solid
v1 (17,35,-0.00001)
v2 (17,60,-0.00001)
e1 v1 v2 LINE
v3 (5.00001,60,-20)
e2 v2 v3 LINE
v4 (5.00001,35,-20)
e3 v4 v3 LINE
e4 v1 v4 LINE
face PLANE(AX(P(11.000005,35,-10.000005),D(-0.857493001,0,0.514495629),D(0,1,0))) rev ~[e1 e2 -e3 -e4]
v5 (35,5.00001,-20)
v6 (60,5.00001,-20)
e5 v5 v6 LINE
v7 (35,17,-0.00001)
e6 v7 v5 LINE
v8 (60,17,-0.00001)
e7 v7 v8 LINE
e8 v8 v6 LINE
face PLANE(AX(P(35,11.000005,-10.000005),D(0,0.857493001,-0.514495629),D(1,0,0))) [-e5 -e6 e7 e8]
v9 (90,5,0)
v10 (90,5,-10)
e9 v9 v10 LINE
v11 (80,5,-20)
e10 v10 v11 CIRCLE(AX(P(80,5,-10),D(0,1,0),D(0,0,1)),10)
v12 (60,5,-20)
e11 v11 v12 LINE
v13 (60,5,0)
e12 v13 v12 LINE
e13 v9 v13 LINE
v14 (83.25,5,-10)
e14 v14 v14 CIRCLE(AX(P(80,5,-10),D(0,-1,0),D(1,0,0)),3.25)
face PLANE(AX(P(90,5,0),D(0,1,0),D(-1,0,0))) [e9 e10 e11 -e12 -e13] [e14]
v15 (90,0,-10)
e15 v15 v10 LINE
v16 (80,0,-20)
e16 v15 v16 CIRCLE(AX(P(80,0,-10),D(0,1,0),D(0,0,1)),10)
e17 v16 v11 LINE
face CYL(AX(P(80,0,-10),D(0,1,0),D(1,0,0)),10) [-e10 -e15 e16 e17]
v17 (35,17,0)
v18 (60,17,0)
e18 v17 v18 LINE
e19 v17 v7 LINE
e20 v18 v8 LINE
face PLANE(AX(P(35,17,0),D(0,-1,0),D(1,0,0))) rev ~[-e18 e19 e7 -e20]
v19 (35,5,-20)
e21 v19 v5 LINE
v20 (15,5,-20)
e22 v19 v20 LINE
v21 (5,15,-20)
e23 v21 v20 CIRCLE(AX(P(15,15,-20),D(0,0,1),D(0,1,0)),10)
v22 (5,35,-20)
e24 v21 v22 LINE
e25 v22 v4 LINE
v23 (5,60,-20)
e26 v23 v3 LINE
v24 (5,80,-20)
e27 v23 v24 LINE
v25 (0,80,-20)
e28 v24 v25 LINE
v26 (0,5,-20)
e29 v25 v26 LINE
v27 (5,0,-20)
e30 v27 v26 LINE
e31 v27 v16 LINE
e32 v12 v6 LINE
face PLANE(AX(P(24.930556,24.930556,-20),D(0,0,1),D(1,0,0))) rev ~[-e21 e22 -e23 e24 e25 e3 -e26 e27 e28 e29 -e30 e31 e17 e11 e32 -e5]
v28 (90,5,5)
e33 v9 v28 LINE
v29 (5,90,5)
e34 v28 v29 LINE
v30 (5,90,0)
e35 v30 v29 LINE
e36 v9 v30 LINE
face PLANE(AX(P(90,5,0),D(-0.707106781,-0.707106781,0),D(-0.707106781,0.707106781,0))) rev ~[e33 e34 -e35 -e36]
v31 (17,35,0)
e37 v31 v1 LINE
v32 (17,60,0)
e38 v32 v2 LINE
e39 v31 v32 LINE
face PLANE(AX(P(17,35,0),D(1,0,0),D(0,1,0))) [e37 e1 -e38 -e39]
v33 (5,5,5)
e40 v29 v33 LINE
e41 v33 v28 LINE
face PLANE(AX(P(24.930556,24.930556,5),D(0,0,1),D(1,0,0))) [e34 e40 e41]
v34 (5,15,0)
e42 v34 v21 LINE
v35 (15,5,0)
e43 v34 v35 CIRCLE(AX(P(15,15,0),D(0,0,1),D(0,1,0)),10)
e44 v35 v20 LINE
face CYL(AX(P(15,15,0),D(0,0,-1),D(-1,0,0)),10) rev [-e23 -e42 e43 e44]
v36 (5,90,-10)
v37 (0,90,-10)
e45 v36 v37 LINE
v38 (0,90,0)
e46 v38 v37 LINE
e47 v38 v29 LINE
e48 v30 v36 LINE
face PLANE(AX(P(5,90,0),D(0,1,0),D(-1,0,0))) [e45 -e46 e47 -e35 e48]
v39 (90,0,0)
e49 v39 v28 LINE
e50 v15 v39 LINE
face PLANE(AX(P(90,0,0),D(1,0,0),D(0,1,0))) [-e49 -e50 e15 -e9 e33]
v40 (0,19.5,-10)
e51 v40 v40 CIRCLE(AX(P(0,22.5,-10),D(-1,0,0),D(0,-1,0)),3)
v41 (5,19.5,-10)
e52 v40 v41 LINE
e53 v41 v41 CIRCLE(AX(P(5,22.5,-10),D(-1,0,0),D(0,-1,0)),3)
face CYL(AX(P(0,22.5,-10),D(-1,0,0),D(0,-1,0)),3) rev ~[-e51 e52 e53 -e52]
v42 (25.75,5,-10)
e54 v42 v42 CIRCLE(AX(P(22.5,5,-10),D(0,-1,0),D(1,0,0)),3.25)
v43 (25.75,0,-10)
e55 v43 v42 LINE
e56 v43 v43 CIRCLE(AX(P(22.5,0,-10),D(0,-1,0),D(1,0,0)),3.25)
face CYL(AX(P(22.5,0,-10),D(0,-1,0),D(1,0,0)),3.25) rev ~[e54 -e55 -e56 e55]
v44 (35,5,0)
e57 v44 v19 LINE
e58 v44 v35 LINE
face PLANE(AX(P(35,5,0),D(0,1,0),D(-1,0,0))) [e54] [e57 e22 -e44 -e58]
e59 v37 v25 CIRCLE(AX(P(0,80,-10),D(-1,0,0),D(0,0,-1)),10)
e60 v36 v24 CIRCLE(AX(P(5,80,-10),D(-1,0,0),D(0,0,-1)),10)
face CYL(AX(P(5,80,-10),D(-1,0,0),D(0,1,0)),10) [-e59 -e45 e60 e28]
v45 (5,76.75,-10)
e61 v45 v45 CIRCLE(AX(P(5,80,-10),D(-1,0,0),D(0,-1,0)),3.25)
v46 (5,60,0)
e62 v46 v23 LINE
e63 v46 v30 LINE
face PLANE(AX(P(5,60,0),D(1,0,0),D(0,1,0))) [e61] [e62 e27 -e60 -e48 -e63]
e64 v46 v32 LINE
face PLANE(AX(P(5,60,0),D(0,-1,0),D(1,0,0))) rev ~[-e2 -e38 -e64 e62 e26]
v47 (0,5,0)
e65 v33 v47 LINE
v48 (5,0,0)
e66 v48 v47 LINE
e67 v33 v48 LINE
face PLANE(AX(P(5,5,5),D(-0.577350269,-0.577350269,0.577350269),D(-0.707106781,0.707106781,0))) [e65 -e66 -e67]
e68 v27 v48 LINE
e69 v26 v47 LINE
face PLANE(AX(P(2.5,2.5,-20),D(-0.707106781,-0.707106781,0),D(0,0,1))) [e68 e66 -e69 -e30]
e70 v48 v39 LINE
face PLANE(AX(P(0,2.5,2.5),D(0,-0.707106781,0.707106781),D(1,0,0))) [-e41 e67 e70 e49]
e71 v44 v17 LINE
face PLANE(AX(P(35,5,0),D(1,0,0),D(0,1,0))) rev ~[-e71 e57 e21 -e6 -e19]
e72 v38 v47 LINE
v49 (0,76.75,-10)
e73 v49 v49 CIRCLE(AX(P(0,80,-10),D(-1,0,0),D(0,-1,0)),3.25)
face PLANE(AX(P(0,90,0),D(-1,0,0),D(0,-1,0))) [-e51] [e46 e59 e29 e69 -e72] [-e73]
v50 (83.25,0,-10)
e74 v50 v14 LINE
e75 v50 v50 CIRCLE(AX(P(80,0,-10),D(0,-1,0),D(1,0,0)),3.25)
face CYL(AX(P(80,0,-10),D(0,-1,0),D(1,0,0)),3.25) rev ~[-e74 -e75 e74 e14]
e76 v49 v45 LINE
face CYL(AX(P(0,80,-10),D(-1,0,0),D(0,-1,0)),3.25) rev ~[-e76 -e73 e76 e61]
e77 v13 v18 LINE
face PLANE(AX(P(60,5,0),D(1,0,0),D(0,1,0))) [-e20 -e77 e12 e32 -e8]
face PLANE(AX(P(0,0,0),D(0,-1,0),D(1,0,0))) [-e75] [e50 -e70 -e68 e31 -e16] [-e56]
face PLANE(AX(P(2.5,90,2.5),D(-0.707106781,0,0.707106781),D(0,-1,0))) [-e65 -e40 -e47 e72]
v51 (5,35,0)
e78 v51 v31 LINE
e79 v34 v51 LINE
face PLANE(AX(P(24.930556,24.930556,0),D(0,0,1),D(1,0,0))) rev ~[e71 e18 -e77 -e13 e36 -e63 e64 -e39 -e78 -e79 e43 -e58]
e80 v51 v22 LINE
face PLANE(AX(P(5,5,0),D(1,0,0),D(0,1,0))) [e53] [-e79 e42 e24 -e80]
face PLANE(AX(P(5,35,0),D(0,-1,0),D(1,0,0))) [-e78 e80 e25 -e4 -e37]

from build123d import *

# Parameters (mm, degrees)
F0_W       = 12
F0_H       = 25
F0_W_2     = 25
F0_H_2     = 12
F1_DEPTH   = 5
F2_DEPTH   = 20
F3_R       = 10
F5_R       = 3.25
F6_DEPTH   = 25
F4_R       = 3
F4_R_2     = 3.25
F7_DEPTH   = 25
F8_SIZE2   = 11.99999
F8_SIZE    = 19.99999
F8_2_SIZE2 = 11.99999
F8_2_SIZE  = 19.99999
F9_SIZE    = 5


# Not quite as in the source:
# - a fillet or chamfer is up to 0.001 mm smaller than in the source, because OpenCascade refuses the exact size


with BuildPart() as f1:
    # F0 (on Top) → F1 (new body)
    with BuildSketch(Plane.XY):
        Polygon((0, 90), (0, 0), (90, 0), (90, 5), (60, 5), (35, 5), (5, 5), (5, 35), (5, 60), (5, 90), align=None)
        Polygon((90, 5), (5, 90), (5, 60), (17, 60), (17, 35), (5, 35), (5, 5), (35, 5), (35, 17), (60, 17), (60, 5), align=None)
        with Locations((11, 47.5)):
            Rectangle(F0_W, F0_H)
        with Locations((47.5, 11)):
            Rectangle(F0_W_2, F0_H_2)
    extrude(amount=F1_DEPTH)

    # F0 (on Top) → F2 (join)
    with BuildSketch(Plane.XY):
        Polygon((0, 90), (0, 0), (90, 0), (90, 5), (60, 5), (35, 5), (5, 5), (5, 35), (5, 60), (5, 90), align=None)
        with Locations((11, 47.5)):
            Rectangle(F0_W, F0_H)
        with Locations((47.5, 11)):
            Rectangle(F0_W_2, F0_H_2)
    extrude(amount=-F2_DEPTH)

    # F3
    f3_edges = [f1.edges().sort_by_distance(p)[0] for p in [
        (5, 5, -10),
        (2.5, 90, -20),
        (90, 2.5, -20),
    ]]
    fillet(f3_edges, radius=F3_R)

    # F5 (on face) → F6 (cut)
    with BuildSketch(Plane.XZ):
        with Locations((22.5, -10)):
            Circle(F5_R)
        with Locations((80, -10)):
            Circle(F5_R)
    extrude(amount=-F6_DEPTH, mode=Mode.SUBTRACT)

    # F4 (on face) → F7 (cut)
    with BuildSketch(Plane(origin=(0, 0, 0), x_dir=(0, -1, 0), z_dir=(-1, 0, 0))):
        with Locations((-22.5, -10)):
            Circle(F4_R)
        with Locations((-80, -10)):
            Circle(F4_R_2)
    extrude(amount=-F7_DEPTH, mode=Mode.SUBTRACT)

    # F8 (size 20 and 12 in the source; OpenCascade refuses exactly that, so slightly less here)
    f8_edges = [f1.edges().sort_by_distance(p)[0] for p in [
        (17, 47.5, -20),
    ]]
    f8_side = f1.faces().sort_by_distance((17, 47.5, -10))[0]
    chamfer(f8_edges, length=F8_SIZE, length2=F8_SIZE2, reference=f8_side)

    # F8#2 (size 20 and 12 in the source; OpenCascade refuses exactly that, so slightly less here)
    f8_2_edges = [f1.edges().sort_by_distance(p)[0] for p in [
        (47.5, 17, -20),
    ]]
    f8_2_side = f1.faces().sort_by_distance((47.5, 17, -10))[0]
    chamfer(f8_2_edges, length=F8_2_SIZE, length2=F8_2_SIZE2, reference=f8_2_side)

    # F9
    f9_edges = [f1.edges().sort_by_distance(p)[0] for p in [
        (0, 0, -7.5),
        (45, 0, 5),
        (0, 45, 5),
    ]]
    chamfer(f9_edges, length=F9_SIZE)


solid = f1.part
